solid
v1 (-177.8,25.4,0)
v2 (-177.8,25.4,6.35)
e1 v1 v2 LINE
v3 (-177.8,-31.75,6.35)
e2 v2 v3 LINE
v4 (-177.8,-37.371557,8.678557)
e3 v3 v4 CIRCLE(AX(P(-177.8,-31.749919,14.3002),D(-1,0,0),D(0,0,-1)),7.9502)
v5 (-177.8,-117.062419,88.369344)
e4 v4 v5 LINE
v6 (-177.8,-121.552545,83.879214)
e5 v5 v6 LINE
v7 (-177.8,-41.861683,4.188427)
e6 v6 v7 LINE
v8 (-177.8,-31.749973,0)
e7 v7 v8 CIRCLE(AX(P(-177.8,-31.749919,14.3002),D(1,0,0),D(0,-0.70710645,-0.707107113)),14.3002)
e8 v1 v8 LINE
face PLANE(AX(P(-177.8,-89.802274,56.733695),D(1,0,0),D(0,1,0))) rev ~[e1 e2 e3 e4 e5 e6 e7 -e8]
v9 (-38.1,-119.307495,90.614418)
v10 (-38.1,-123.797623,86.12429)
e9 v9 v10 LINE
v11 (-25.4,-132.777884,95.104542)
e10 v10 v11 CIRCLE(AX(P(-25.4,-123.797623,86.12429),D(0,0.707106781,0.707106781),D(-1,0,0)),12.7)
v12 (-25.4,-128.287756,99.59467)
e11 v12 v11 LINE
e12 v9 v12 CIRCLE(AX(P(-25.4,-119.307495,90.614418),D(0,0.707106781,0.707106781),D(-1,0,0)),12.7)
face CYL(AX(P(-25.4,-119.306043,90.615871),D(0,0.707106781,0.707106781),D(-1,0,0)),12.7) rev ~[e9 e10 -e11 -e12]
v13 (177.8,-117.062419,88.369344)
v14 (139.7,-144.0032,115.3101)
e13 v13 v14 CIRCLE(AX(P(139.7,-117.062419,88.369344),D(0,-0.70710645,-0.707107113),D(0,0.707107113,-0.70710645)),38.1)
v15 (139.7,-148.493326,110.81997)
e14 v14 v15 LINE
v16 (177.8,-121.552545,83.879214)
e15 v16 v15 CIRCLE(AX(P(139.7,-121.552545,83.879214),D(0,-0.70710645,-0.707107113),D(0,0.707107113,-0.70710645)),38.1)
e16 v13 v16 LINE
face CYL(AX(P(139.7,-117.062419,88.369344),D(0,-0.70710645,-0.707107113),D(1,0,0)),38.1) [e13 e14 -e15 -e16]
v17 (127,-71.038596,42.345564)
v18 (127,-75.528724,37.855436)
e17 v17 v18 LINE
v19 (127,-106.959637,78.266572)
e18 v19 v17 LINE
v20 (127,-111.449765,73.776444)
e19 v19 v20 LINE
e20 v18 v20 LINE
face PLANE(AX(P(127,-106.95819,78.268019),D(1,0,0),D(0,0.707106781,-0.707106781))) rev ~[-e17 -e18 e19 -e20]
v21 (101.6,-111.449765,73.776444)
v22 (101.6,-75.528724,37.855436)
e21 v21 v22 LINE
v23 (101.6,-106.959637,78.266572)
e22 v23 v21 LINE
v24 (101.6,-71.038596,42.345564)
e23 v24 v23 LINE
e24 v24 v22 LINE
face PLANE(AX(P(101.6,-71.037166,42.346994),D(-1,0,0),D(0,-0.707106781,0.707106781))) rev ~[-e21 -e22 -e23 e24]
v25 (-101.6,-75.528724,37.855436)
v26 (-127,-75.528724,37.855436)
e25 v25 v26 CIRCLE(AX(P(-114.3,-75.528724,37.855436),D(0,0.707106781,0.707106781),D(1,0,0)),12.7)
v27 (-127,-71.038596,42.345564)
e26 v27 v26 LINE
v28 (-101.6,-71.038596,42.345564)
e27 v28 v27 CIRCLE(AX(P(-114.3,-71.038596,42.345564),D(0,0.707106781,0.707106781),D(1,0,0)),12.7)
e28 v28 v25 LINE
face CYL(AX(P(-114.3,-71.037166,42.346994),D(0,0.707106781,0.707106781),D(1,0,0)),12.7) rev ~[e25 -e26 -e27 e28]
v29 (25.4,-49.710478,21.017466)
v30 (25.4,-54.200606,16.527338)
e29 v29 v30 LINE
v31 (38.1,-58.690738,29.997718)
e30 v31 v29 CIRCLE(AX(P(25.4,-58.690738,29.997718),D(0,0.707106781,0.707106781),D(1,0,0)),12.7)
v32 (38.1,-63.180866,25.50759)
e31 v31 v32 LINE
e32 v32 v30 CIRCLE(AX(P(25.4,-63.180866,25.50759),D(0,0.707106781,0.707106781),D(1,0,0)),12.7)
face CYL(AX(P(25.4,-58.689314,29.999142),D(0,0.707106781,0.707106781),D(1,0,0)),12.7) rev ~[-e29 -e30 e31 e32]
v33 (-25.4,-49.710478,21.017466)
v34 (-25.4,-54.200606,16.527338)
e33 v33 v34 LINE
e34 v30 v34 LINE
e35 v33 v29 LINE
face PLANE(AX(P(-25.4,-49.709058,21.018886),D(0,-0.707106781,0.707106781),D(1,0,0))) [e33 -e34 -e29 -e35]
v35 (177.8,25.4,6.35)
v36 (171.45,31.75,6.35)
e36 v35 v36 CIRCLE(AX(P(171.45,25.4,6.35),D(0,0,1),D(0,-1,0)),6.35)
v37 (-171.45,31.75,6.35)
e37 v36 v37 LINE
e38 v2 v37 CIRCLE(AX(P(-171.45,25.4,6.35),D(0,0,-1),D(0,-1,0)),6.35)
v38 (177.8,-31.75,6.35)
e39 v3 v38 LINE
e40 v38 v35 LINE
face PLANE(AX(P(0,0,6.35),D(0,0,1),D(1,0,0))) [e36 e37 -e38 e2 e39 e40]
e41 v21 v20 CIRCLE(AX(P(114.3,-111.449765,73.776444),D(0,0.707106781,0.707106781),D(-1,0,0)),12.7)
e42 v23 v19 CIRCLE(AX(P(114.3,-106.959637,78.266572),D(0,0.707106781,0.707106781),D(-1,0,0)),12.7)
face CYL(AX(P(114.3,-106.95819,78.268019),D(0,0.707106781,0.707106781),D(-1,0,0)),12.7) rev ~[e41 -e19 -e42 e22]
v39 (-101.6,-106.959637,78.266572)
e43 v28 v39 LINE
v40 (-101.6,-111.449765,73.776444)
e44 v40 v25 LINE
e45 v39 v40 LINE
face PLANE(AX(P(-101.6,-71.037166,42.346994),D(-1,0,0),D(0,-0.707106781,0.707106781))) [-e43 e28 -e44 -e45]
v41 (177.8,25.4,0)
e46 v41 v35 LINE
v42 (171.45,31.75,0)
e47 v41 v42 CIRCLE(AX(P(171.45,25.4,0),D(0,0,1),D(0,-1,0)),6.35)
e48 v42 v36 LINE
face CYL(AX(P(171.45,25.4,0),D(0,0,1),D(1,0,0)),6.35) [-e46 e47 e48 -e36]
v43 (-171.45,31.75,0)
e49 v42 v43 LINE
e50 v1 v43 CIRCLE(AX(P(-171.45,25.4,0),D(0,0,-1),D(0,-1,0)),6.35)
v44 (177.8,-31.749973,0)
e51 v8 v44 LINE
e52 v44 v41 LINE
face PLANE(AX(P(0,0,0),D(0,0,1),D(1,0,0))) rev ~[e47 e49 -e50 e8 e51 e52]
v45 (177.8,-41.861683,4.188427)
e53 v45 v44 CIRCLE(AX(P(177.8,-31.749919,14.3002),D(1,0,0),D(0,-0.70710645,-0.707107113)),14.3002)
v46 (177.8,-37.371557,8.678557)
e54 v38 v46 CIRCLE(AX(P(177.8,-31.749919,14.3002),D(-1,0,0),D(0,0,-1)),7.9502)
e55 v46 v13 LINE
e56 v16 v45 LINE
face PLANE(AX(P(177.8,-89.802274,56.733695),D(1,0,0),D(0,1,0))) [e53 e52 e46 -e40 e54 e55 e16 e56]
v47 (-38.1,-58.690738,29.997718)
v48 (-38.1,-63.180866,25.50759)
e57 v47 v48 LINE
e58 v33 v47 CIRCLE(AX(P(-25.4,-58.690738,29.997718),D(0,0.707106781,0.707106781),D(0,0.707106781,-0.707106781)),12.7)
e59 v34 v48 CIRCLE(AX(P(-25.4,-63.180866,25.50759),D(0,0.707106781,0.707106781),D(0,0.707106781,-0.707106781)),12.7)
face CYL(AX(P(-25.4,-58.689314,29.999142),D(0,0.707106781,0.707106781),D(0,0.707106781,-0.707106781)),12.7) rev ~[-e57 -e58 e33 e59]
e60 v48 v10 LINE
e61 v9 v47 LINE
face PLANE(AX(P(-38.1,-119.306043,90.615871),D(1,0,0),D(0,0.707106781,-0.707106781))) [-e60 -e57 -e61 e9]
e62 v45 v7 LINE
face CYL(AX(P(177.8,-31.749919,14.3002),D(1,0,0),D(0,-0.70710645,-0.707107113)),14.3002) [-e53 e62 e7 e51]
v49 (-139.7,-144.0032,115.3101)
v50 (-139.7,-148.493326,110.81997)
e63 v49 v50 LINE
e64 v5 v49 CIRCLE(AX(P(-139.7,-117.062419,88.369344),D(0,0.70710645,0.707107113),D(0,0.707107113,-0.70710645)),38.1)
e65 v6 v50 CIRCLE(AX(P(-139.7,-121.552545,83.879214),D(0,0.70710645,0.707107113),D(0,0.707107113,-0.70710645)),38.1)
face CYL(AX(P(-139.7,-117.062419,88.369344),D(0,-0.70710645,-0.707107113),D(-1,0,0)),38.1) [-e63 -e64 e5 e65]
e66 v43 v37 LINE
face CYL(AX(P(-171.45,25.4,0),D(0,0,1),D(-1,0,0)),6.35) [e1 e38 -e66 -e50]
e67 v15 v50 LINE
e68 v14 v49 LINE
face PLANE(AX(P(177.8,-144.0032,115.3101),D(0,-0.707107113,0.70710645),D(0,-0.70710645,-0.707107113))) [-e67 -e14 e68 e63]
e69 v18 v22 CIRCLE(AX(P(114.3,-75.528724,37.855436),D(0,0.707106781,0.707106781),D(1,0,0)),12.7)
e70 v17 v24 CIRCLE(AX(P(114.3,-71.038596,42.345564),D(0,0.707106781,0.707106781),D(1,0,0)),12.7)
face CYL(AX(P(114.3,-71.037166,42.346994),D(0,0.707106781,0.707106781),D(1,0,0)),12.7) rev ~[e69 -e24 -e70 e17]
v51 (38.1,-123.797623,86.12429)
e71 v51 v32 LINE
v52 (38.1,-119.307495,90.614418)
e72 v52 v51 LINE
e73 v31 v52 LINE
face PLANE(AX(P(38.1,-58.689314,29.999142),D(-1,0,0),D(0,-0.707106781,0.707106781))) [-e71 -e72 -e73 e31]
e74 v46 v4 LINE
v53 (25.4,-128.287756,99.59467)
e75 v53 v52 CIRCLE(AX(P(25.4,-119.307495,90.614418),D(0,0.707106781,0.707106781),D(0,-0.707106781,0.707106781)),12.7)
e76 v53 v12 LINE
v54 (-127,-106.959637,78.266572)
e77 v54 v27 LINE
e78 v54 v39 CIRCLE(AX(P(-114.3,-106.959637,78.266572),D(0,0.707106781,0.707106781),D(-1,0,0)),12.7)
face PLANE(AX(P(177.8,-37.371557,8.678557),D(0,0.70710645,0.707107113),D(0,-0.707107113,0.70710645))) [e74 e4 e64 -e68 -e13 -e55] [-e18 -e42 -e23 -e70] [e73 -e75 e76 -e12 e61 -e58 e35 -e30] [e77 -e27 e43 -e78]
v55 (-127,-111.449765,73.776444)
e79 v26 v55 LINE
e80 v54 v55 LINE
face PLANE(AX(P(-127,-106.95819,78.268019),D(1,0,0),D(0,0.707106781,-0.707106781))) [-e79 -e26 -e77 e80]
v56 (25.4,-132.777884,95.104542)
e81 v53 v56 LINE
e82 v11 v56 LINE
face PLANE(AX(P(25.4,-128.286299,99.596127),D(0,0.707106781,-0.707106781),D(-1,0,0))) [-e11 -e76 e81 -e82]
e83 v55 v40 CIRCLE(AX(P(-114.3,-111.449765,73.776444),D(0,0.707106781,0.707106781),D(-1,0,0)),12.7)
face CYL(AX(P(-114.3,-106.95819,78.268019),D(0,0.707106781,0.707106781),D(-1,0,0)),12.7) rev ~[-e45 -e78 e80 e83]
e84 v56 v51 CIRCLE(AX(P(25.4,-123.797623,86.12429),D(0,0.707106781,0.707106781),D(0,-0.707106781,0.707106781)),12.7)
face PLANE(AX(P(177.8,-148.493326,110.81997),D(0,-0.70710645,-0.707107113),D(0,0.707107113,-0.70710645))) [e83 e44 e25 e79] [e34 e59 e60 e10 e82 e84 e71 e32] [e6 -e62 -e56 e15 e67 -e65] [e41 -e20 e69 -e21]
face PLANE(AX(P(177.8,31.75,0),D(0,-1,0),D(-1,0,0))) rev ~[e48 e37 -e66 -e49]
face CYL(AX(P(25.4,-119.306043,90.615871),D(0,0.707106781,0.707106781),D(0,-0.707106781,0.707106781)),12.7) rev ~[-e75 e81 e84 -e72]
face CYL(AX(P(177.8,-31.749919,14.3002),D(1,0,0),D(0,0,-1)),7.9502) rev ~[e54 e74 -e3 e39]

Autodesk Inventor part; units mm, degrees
ref_plane "YZ Plane" through (0, 0, 0) normal (1, 0, 0) x (0, 1, 0)
ref_plane "XZ Plane" through (0, 0, 0) normal (0, 1, 0) x (-1, 0, 0)
ref_plane "XY Plane" through (0, 0, 0) normal (0, 0, 1) x (1, 0, 0)
sketch "Sketch1" plane through (0, 0, 0) normal (0, 0, 1) x (1, 0, 0)
  line L0 (-177.8, -31.75) -> (177.8, -31.75)
  line L1 (177.8, -31.75) -> (177.8, 31.75)
  line L2 (177.8, 31.75) -> (-177.8, 31.75)
  line L3 (-177.8, 31.75) -> (-177.8, -31.75)
  line L4 (-177.8, -31.75) -> (177.8, 31.75) construction
  line L5 (177.8, -31.75) -> (-177.8, 31.75) construction
  point P0 (0, 0)
  point P1 (0, 0)
  dimension "d31" = 355.6
  dimension "d32" = 63.5
extrude "Plate1" add sketch "Sketch1" along normal blind 6.35
sketch "Sketch3" plane through (177.8, -37.3716, 8.6786) normal (0, -0.7071068, -0.7071068) x (1, 0, 0)
  line L0 (-355.6, 0) -> (0, 0)
  line L1 (0, 0) -> (0, 150.7998)
  line L2 (0, 150.7998) -> (-355.6, 150.7998)
  line L3 (-355.6, 150.7998) -> (-355.6, 0)
edge flange "Flange2" height 165.1 angle 45 thickness 6.35 bend radius 7.9502 thickness toward (0, -0.7071068, -0.7071068) relief tear relief width 6.35 relief depth 3.175 edges at (0, -31.75, 6.35) wall of the first edge with corners at (-177.8, -37.3716, 8.6786) (177.8, -37.3716, 8.6786) (177.8, -144.0032, 115.3101) (-177.8, -144.0032, 115.3101)
bend "Bend2"
corner "Corner2"
fillet "Corner Round1" radius 6.35 2 edges at (177.8, 31.75, 3.175) (-177.8, 31.75, 3.175)
fillet "Corner Round2" radius 38.1 2 edges at (177.8, -146.2483, 113.0651) (-177.8, -146.2483, 113.0651)
sketch "Sketch4" plane through (-177.8, -37.3716, 8.6786) normal (0, 0.7071068, 0.7071068) x (1, 0, 0)
  line L0 (152.4, -17.4498) -> (203.2, -17.4498)
  line L1 (215.9, -30.1498) -> (215.9, -115.8748)
  line L2 (203.2, -128.5748) -> (152.4, -128.5748)
  line L3 (139.7, -115.8748) -> (139.7, -30.1498)
  line L4 (139.7, -17.4498) -> (215.9, -128.5748) construction
  line L5 (215.9, -17.4498) -> (139.7, -128.5748) construction
  line L6 (38.1, -150.7998) -> (317.5, -150.7998) construction
  arc A0 (152.4, -17.4498) -> (139.7, -30.1498) centre (152.4, -30.1498) ccw
  arc A1 (215.9, -30.1498) -> (203.2, -17.4498) centre (203.2, -30.1498) ccw
  arc A2 (203.2, -128.5748) -> (215.9, -115.8748) centre (203.2, -115.8748) ccw
  arc A3 (139.7, -115.8748) -> (152.4, -128.5748) centre (152.4, -115.8748) ccw
  line L7 (63.5, -98.4123) -> (63.5, -47.6123) construction
  line L8 (50.8, -98.4123) -> (50.8, -47.6123)
  line L9 (76.2, -47.6123) -> (76.2, -98.4123)
  arc A4 (50.8, -98.4123) -> (76.2, -98.4123) centre (63.5, -98.4123) ccw
  arc A5 (76.2, -47.6123) -> (50.8, -47.6123) centre (63.5, -47.6123) ccw
  line L10 (0, -112.6998) -> (0, 0) projected
  line L11 (177.8, -73.0123) -> (177.8, -150.7998) construction
  line L12 (292.1, -98.4123) -> (292.1, -47.6123) construction
  line L13 (304.8, -98.4123) -> (304.8, -47.6123)
  line L14 (279.4, -47.6123) -> (279.4, -98.4123)
  arc A6 (279.4, -98.4123) -> (304.8, -98.4123) centre (292.1, -98.4123) ccw
  arc A7 (304.8, -47.6123) -> (279.4, -47.6123) centre (292.1, -47.6123) ccw
  point P0 (63.5, -73.0123)
  dimension "d45" = 22.225
  dimension "d46" = 76.2
  dimension "d47" = 111.125
  dimension "d50" = 12.7
  dimension "d51" = 12.7
  dimension "d52" = 50.8
  dimension "d53" = 63.5
  dimension "d54" = 25.4
extrude "Cut1" cut sketch "Sketch4" against normal blind 6.35
equation "\"d48\" = Thickness"
equation "\"d15\" = Thickness"
equation "\"d33\" = BendReliefWidth"
equation "\"d34\" = BendReliefDepth"
equation "\"d35\" = MinimumRemnant"
equation "\"d36\" = TransitionRadius"
equation "\"d39\" = BendRadius"
equation "\"d40\" = CornerReliefSize"
equation "\"d41\" = GapSize"
equation "\"d42\" = JacobiRadiusSize"
equation "\"BendReliefWidth\" = Thickness"
equation "\"BendReliefDepth\" = 0.5 * Thickness"
equation "\"CornerReliefSize\" = 4 * Thickness"
equation "\"MinimumRemnant\" = 2 * Thickness"
equation "\"TransitionRadius\" = BendRadius"
equation "\"JacobiRadiusSize\" = Thickness"
equation "\"GapSize\" = Thickness"
equation "\"Thickness\" = 6.35"
equation "\"BendRadius\" = 7.9502"
properties part number "Model-4_Sheet Stifferner" material "SS304"
